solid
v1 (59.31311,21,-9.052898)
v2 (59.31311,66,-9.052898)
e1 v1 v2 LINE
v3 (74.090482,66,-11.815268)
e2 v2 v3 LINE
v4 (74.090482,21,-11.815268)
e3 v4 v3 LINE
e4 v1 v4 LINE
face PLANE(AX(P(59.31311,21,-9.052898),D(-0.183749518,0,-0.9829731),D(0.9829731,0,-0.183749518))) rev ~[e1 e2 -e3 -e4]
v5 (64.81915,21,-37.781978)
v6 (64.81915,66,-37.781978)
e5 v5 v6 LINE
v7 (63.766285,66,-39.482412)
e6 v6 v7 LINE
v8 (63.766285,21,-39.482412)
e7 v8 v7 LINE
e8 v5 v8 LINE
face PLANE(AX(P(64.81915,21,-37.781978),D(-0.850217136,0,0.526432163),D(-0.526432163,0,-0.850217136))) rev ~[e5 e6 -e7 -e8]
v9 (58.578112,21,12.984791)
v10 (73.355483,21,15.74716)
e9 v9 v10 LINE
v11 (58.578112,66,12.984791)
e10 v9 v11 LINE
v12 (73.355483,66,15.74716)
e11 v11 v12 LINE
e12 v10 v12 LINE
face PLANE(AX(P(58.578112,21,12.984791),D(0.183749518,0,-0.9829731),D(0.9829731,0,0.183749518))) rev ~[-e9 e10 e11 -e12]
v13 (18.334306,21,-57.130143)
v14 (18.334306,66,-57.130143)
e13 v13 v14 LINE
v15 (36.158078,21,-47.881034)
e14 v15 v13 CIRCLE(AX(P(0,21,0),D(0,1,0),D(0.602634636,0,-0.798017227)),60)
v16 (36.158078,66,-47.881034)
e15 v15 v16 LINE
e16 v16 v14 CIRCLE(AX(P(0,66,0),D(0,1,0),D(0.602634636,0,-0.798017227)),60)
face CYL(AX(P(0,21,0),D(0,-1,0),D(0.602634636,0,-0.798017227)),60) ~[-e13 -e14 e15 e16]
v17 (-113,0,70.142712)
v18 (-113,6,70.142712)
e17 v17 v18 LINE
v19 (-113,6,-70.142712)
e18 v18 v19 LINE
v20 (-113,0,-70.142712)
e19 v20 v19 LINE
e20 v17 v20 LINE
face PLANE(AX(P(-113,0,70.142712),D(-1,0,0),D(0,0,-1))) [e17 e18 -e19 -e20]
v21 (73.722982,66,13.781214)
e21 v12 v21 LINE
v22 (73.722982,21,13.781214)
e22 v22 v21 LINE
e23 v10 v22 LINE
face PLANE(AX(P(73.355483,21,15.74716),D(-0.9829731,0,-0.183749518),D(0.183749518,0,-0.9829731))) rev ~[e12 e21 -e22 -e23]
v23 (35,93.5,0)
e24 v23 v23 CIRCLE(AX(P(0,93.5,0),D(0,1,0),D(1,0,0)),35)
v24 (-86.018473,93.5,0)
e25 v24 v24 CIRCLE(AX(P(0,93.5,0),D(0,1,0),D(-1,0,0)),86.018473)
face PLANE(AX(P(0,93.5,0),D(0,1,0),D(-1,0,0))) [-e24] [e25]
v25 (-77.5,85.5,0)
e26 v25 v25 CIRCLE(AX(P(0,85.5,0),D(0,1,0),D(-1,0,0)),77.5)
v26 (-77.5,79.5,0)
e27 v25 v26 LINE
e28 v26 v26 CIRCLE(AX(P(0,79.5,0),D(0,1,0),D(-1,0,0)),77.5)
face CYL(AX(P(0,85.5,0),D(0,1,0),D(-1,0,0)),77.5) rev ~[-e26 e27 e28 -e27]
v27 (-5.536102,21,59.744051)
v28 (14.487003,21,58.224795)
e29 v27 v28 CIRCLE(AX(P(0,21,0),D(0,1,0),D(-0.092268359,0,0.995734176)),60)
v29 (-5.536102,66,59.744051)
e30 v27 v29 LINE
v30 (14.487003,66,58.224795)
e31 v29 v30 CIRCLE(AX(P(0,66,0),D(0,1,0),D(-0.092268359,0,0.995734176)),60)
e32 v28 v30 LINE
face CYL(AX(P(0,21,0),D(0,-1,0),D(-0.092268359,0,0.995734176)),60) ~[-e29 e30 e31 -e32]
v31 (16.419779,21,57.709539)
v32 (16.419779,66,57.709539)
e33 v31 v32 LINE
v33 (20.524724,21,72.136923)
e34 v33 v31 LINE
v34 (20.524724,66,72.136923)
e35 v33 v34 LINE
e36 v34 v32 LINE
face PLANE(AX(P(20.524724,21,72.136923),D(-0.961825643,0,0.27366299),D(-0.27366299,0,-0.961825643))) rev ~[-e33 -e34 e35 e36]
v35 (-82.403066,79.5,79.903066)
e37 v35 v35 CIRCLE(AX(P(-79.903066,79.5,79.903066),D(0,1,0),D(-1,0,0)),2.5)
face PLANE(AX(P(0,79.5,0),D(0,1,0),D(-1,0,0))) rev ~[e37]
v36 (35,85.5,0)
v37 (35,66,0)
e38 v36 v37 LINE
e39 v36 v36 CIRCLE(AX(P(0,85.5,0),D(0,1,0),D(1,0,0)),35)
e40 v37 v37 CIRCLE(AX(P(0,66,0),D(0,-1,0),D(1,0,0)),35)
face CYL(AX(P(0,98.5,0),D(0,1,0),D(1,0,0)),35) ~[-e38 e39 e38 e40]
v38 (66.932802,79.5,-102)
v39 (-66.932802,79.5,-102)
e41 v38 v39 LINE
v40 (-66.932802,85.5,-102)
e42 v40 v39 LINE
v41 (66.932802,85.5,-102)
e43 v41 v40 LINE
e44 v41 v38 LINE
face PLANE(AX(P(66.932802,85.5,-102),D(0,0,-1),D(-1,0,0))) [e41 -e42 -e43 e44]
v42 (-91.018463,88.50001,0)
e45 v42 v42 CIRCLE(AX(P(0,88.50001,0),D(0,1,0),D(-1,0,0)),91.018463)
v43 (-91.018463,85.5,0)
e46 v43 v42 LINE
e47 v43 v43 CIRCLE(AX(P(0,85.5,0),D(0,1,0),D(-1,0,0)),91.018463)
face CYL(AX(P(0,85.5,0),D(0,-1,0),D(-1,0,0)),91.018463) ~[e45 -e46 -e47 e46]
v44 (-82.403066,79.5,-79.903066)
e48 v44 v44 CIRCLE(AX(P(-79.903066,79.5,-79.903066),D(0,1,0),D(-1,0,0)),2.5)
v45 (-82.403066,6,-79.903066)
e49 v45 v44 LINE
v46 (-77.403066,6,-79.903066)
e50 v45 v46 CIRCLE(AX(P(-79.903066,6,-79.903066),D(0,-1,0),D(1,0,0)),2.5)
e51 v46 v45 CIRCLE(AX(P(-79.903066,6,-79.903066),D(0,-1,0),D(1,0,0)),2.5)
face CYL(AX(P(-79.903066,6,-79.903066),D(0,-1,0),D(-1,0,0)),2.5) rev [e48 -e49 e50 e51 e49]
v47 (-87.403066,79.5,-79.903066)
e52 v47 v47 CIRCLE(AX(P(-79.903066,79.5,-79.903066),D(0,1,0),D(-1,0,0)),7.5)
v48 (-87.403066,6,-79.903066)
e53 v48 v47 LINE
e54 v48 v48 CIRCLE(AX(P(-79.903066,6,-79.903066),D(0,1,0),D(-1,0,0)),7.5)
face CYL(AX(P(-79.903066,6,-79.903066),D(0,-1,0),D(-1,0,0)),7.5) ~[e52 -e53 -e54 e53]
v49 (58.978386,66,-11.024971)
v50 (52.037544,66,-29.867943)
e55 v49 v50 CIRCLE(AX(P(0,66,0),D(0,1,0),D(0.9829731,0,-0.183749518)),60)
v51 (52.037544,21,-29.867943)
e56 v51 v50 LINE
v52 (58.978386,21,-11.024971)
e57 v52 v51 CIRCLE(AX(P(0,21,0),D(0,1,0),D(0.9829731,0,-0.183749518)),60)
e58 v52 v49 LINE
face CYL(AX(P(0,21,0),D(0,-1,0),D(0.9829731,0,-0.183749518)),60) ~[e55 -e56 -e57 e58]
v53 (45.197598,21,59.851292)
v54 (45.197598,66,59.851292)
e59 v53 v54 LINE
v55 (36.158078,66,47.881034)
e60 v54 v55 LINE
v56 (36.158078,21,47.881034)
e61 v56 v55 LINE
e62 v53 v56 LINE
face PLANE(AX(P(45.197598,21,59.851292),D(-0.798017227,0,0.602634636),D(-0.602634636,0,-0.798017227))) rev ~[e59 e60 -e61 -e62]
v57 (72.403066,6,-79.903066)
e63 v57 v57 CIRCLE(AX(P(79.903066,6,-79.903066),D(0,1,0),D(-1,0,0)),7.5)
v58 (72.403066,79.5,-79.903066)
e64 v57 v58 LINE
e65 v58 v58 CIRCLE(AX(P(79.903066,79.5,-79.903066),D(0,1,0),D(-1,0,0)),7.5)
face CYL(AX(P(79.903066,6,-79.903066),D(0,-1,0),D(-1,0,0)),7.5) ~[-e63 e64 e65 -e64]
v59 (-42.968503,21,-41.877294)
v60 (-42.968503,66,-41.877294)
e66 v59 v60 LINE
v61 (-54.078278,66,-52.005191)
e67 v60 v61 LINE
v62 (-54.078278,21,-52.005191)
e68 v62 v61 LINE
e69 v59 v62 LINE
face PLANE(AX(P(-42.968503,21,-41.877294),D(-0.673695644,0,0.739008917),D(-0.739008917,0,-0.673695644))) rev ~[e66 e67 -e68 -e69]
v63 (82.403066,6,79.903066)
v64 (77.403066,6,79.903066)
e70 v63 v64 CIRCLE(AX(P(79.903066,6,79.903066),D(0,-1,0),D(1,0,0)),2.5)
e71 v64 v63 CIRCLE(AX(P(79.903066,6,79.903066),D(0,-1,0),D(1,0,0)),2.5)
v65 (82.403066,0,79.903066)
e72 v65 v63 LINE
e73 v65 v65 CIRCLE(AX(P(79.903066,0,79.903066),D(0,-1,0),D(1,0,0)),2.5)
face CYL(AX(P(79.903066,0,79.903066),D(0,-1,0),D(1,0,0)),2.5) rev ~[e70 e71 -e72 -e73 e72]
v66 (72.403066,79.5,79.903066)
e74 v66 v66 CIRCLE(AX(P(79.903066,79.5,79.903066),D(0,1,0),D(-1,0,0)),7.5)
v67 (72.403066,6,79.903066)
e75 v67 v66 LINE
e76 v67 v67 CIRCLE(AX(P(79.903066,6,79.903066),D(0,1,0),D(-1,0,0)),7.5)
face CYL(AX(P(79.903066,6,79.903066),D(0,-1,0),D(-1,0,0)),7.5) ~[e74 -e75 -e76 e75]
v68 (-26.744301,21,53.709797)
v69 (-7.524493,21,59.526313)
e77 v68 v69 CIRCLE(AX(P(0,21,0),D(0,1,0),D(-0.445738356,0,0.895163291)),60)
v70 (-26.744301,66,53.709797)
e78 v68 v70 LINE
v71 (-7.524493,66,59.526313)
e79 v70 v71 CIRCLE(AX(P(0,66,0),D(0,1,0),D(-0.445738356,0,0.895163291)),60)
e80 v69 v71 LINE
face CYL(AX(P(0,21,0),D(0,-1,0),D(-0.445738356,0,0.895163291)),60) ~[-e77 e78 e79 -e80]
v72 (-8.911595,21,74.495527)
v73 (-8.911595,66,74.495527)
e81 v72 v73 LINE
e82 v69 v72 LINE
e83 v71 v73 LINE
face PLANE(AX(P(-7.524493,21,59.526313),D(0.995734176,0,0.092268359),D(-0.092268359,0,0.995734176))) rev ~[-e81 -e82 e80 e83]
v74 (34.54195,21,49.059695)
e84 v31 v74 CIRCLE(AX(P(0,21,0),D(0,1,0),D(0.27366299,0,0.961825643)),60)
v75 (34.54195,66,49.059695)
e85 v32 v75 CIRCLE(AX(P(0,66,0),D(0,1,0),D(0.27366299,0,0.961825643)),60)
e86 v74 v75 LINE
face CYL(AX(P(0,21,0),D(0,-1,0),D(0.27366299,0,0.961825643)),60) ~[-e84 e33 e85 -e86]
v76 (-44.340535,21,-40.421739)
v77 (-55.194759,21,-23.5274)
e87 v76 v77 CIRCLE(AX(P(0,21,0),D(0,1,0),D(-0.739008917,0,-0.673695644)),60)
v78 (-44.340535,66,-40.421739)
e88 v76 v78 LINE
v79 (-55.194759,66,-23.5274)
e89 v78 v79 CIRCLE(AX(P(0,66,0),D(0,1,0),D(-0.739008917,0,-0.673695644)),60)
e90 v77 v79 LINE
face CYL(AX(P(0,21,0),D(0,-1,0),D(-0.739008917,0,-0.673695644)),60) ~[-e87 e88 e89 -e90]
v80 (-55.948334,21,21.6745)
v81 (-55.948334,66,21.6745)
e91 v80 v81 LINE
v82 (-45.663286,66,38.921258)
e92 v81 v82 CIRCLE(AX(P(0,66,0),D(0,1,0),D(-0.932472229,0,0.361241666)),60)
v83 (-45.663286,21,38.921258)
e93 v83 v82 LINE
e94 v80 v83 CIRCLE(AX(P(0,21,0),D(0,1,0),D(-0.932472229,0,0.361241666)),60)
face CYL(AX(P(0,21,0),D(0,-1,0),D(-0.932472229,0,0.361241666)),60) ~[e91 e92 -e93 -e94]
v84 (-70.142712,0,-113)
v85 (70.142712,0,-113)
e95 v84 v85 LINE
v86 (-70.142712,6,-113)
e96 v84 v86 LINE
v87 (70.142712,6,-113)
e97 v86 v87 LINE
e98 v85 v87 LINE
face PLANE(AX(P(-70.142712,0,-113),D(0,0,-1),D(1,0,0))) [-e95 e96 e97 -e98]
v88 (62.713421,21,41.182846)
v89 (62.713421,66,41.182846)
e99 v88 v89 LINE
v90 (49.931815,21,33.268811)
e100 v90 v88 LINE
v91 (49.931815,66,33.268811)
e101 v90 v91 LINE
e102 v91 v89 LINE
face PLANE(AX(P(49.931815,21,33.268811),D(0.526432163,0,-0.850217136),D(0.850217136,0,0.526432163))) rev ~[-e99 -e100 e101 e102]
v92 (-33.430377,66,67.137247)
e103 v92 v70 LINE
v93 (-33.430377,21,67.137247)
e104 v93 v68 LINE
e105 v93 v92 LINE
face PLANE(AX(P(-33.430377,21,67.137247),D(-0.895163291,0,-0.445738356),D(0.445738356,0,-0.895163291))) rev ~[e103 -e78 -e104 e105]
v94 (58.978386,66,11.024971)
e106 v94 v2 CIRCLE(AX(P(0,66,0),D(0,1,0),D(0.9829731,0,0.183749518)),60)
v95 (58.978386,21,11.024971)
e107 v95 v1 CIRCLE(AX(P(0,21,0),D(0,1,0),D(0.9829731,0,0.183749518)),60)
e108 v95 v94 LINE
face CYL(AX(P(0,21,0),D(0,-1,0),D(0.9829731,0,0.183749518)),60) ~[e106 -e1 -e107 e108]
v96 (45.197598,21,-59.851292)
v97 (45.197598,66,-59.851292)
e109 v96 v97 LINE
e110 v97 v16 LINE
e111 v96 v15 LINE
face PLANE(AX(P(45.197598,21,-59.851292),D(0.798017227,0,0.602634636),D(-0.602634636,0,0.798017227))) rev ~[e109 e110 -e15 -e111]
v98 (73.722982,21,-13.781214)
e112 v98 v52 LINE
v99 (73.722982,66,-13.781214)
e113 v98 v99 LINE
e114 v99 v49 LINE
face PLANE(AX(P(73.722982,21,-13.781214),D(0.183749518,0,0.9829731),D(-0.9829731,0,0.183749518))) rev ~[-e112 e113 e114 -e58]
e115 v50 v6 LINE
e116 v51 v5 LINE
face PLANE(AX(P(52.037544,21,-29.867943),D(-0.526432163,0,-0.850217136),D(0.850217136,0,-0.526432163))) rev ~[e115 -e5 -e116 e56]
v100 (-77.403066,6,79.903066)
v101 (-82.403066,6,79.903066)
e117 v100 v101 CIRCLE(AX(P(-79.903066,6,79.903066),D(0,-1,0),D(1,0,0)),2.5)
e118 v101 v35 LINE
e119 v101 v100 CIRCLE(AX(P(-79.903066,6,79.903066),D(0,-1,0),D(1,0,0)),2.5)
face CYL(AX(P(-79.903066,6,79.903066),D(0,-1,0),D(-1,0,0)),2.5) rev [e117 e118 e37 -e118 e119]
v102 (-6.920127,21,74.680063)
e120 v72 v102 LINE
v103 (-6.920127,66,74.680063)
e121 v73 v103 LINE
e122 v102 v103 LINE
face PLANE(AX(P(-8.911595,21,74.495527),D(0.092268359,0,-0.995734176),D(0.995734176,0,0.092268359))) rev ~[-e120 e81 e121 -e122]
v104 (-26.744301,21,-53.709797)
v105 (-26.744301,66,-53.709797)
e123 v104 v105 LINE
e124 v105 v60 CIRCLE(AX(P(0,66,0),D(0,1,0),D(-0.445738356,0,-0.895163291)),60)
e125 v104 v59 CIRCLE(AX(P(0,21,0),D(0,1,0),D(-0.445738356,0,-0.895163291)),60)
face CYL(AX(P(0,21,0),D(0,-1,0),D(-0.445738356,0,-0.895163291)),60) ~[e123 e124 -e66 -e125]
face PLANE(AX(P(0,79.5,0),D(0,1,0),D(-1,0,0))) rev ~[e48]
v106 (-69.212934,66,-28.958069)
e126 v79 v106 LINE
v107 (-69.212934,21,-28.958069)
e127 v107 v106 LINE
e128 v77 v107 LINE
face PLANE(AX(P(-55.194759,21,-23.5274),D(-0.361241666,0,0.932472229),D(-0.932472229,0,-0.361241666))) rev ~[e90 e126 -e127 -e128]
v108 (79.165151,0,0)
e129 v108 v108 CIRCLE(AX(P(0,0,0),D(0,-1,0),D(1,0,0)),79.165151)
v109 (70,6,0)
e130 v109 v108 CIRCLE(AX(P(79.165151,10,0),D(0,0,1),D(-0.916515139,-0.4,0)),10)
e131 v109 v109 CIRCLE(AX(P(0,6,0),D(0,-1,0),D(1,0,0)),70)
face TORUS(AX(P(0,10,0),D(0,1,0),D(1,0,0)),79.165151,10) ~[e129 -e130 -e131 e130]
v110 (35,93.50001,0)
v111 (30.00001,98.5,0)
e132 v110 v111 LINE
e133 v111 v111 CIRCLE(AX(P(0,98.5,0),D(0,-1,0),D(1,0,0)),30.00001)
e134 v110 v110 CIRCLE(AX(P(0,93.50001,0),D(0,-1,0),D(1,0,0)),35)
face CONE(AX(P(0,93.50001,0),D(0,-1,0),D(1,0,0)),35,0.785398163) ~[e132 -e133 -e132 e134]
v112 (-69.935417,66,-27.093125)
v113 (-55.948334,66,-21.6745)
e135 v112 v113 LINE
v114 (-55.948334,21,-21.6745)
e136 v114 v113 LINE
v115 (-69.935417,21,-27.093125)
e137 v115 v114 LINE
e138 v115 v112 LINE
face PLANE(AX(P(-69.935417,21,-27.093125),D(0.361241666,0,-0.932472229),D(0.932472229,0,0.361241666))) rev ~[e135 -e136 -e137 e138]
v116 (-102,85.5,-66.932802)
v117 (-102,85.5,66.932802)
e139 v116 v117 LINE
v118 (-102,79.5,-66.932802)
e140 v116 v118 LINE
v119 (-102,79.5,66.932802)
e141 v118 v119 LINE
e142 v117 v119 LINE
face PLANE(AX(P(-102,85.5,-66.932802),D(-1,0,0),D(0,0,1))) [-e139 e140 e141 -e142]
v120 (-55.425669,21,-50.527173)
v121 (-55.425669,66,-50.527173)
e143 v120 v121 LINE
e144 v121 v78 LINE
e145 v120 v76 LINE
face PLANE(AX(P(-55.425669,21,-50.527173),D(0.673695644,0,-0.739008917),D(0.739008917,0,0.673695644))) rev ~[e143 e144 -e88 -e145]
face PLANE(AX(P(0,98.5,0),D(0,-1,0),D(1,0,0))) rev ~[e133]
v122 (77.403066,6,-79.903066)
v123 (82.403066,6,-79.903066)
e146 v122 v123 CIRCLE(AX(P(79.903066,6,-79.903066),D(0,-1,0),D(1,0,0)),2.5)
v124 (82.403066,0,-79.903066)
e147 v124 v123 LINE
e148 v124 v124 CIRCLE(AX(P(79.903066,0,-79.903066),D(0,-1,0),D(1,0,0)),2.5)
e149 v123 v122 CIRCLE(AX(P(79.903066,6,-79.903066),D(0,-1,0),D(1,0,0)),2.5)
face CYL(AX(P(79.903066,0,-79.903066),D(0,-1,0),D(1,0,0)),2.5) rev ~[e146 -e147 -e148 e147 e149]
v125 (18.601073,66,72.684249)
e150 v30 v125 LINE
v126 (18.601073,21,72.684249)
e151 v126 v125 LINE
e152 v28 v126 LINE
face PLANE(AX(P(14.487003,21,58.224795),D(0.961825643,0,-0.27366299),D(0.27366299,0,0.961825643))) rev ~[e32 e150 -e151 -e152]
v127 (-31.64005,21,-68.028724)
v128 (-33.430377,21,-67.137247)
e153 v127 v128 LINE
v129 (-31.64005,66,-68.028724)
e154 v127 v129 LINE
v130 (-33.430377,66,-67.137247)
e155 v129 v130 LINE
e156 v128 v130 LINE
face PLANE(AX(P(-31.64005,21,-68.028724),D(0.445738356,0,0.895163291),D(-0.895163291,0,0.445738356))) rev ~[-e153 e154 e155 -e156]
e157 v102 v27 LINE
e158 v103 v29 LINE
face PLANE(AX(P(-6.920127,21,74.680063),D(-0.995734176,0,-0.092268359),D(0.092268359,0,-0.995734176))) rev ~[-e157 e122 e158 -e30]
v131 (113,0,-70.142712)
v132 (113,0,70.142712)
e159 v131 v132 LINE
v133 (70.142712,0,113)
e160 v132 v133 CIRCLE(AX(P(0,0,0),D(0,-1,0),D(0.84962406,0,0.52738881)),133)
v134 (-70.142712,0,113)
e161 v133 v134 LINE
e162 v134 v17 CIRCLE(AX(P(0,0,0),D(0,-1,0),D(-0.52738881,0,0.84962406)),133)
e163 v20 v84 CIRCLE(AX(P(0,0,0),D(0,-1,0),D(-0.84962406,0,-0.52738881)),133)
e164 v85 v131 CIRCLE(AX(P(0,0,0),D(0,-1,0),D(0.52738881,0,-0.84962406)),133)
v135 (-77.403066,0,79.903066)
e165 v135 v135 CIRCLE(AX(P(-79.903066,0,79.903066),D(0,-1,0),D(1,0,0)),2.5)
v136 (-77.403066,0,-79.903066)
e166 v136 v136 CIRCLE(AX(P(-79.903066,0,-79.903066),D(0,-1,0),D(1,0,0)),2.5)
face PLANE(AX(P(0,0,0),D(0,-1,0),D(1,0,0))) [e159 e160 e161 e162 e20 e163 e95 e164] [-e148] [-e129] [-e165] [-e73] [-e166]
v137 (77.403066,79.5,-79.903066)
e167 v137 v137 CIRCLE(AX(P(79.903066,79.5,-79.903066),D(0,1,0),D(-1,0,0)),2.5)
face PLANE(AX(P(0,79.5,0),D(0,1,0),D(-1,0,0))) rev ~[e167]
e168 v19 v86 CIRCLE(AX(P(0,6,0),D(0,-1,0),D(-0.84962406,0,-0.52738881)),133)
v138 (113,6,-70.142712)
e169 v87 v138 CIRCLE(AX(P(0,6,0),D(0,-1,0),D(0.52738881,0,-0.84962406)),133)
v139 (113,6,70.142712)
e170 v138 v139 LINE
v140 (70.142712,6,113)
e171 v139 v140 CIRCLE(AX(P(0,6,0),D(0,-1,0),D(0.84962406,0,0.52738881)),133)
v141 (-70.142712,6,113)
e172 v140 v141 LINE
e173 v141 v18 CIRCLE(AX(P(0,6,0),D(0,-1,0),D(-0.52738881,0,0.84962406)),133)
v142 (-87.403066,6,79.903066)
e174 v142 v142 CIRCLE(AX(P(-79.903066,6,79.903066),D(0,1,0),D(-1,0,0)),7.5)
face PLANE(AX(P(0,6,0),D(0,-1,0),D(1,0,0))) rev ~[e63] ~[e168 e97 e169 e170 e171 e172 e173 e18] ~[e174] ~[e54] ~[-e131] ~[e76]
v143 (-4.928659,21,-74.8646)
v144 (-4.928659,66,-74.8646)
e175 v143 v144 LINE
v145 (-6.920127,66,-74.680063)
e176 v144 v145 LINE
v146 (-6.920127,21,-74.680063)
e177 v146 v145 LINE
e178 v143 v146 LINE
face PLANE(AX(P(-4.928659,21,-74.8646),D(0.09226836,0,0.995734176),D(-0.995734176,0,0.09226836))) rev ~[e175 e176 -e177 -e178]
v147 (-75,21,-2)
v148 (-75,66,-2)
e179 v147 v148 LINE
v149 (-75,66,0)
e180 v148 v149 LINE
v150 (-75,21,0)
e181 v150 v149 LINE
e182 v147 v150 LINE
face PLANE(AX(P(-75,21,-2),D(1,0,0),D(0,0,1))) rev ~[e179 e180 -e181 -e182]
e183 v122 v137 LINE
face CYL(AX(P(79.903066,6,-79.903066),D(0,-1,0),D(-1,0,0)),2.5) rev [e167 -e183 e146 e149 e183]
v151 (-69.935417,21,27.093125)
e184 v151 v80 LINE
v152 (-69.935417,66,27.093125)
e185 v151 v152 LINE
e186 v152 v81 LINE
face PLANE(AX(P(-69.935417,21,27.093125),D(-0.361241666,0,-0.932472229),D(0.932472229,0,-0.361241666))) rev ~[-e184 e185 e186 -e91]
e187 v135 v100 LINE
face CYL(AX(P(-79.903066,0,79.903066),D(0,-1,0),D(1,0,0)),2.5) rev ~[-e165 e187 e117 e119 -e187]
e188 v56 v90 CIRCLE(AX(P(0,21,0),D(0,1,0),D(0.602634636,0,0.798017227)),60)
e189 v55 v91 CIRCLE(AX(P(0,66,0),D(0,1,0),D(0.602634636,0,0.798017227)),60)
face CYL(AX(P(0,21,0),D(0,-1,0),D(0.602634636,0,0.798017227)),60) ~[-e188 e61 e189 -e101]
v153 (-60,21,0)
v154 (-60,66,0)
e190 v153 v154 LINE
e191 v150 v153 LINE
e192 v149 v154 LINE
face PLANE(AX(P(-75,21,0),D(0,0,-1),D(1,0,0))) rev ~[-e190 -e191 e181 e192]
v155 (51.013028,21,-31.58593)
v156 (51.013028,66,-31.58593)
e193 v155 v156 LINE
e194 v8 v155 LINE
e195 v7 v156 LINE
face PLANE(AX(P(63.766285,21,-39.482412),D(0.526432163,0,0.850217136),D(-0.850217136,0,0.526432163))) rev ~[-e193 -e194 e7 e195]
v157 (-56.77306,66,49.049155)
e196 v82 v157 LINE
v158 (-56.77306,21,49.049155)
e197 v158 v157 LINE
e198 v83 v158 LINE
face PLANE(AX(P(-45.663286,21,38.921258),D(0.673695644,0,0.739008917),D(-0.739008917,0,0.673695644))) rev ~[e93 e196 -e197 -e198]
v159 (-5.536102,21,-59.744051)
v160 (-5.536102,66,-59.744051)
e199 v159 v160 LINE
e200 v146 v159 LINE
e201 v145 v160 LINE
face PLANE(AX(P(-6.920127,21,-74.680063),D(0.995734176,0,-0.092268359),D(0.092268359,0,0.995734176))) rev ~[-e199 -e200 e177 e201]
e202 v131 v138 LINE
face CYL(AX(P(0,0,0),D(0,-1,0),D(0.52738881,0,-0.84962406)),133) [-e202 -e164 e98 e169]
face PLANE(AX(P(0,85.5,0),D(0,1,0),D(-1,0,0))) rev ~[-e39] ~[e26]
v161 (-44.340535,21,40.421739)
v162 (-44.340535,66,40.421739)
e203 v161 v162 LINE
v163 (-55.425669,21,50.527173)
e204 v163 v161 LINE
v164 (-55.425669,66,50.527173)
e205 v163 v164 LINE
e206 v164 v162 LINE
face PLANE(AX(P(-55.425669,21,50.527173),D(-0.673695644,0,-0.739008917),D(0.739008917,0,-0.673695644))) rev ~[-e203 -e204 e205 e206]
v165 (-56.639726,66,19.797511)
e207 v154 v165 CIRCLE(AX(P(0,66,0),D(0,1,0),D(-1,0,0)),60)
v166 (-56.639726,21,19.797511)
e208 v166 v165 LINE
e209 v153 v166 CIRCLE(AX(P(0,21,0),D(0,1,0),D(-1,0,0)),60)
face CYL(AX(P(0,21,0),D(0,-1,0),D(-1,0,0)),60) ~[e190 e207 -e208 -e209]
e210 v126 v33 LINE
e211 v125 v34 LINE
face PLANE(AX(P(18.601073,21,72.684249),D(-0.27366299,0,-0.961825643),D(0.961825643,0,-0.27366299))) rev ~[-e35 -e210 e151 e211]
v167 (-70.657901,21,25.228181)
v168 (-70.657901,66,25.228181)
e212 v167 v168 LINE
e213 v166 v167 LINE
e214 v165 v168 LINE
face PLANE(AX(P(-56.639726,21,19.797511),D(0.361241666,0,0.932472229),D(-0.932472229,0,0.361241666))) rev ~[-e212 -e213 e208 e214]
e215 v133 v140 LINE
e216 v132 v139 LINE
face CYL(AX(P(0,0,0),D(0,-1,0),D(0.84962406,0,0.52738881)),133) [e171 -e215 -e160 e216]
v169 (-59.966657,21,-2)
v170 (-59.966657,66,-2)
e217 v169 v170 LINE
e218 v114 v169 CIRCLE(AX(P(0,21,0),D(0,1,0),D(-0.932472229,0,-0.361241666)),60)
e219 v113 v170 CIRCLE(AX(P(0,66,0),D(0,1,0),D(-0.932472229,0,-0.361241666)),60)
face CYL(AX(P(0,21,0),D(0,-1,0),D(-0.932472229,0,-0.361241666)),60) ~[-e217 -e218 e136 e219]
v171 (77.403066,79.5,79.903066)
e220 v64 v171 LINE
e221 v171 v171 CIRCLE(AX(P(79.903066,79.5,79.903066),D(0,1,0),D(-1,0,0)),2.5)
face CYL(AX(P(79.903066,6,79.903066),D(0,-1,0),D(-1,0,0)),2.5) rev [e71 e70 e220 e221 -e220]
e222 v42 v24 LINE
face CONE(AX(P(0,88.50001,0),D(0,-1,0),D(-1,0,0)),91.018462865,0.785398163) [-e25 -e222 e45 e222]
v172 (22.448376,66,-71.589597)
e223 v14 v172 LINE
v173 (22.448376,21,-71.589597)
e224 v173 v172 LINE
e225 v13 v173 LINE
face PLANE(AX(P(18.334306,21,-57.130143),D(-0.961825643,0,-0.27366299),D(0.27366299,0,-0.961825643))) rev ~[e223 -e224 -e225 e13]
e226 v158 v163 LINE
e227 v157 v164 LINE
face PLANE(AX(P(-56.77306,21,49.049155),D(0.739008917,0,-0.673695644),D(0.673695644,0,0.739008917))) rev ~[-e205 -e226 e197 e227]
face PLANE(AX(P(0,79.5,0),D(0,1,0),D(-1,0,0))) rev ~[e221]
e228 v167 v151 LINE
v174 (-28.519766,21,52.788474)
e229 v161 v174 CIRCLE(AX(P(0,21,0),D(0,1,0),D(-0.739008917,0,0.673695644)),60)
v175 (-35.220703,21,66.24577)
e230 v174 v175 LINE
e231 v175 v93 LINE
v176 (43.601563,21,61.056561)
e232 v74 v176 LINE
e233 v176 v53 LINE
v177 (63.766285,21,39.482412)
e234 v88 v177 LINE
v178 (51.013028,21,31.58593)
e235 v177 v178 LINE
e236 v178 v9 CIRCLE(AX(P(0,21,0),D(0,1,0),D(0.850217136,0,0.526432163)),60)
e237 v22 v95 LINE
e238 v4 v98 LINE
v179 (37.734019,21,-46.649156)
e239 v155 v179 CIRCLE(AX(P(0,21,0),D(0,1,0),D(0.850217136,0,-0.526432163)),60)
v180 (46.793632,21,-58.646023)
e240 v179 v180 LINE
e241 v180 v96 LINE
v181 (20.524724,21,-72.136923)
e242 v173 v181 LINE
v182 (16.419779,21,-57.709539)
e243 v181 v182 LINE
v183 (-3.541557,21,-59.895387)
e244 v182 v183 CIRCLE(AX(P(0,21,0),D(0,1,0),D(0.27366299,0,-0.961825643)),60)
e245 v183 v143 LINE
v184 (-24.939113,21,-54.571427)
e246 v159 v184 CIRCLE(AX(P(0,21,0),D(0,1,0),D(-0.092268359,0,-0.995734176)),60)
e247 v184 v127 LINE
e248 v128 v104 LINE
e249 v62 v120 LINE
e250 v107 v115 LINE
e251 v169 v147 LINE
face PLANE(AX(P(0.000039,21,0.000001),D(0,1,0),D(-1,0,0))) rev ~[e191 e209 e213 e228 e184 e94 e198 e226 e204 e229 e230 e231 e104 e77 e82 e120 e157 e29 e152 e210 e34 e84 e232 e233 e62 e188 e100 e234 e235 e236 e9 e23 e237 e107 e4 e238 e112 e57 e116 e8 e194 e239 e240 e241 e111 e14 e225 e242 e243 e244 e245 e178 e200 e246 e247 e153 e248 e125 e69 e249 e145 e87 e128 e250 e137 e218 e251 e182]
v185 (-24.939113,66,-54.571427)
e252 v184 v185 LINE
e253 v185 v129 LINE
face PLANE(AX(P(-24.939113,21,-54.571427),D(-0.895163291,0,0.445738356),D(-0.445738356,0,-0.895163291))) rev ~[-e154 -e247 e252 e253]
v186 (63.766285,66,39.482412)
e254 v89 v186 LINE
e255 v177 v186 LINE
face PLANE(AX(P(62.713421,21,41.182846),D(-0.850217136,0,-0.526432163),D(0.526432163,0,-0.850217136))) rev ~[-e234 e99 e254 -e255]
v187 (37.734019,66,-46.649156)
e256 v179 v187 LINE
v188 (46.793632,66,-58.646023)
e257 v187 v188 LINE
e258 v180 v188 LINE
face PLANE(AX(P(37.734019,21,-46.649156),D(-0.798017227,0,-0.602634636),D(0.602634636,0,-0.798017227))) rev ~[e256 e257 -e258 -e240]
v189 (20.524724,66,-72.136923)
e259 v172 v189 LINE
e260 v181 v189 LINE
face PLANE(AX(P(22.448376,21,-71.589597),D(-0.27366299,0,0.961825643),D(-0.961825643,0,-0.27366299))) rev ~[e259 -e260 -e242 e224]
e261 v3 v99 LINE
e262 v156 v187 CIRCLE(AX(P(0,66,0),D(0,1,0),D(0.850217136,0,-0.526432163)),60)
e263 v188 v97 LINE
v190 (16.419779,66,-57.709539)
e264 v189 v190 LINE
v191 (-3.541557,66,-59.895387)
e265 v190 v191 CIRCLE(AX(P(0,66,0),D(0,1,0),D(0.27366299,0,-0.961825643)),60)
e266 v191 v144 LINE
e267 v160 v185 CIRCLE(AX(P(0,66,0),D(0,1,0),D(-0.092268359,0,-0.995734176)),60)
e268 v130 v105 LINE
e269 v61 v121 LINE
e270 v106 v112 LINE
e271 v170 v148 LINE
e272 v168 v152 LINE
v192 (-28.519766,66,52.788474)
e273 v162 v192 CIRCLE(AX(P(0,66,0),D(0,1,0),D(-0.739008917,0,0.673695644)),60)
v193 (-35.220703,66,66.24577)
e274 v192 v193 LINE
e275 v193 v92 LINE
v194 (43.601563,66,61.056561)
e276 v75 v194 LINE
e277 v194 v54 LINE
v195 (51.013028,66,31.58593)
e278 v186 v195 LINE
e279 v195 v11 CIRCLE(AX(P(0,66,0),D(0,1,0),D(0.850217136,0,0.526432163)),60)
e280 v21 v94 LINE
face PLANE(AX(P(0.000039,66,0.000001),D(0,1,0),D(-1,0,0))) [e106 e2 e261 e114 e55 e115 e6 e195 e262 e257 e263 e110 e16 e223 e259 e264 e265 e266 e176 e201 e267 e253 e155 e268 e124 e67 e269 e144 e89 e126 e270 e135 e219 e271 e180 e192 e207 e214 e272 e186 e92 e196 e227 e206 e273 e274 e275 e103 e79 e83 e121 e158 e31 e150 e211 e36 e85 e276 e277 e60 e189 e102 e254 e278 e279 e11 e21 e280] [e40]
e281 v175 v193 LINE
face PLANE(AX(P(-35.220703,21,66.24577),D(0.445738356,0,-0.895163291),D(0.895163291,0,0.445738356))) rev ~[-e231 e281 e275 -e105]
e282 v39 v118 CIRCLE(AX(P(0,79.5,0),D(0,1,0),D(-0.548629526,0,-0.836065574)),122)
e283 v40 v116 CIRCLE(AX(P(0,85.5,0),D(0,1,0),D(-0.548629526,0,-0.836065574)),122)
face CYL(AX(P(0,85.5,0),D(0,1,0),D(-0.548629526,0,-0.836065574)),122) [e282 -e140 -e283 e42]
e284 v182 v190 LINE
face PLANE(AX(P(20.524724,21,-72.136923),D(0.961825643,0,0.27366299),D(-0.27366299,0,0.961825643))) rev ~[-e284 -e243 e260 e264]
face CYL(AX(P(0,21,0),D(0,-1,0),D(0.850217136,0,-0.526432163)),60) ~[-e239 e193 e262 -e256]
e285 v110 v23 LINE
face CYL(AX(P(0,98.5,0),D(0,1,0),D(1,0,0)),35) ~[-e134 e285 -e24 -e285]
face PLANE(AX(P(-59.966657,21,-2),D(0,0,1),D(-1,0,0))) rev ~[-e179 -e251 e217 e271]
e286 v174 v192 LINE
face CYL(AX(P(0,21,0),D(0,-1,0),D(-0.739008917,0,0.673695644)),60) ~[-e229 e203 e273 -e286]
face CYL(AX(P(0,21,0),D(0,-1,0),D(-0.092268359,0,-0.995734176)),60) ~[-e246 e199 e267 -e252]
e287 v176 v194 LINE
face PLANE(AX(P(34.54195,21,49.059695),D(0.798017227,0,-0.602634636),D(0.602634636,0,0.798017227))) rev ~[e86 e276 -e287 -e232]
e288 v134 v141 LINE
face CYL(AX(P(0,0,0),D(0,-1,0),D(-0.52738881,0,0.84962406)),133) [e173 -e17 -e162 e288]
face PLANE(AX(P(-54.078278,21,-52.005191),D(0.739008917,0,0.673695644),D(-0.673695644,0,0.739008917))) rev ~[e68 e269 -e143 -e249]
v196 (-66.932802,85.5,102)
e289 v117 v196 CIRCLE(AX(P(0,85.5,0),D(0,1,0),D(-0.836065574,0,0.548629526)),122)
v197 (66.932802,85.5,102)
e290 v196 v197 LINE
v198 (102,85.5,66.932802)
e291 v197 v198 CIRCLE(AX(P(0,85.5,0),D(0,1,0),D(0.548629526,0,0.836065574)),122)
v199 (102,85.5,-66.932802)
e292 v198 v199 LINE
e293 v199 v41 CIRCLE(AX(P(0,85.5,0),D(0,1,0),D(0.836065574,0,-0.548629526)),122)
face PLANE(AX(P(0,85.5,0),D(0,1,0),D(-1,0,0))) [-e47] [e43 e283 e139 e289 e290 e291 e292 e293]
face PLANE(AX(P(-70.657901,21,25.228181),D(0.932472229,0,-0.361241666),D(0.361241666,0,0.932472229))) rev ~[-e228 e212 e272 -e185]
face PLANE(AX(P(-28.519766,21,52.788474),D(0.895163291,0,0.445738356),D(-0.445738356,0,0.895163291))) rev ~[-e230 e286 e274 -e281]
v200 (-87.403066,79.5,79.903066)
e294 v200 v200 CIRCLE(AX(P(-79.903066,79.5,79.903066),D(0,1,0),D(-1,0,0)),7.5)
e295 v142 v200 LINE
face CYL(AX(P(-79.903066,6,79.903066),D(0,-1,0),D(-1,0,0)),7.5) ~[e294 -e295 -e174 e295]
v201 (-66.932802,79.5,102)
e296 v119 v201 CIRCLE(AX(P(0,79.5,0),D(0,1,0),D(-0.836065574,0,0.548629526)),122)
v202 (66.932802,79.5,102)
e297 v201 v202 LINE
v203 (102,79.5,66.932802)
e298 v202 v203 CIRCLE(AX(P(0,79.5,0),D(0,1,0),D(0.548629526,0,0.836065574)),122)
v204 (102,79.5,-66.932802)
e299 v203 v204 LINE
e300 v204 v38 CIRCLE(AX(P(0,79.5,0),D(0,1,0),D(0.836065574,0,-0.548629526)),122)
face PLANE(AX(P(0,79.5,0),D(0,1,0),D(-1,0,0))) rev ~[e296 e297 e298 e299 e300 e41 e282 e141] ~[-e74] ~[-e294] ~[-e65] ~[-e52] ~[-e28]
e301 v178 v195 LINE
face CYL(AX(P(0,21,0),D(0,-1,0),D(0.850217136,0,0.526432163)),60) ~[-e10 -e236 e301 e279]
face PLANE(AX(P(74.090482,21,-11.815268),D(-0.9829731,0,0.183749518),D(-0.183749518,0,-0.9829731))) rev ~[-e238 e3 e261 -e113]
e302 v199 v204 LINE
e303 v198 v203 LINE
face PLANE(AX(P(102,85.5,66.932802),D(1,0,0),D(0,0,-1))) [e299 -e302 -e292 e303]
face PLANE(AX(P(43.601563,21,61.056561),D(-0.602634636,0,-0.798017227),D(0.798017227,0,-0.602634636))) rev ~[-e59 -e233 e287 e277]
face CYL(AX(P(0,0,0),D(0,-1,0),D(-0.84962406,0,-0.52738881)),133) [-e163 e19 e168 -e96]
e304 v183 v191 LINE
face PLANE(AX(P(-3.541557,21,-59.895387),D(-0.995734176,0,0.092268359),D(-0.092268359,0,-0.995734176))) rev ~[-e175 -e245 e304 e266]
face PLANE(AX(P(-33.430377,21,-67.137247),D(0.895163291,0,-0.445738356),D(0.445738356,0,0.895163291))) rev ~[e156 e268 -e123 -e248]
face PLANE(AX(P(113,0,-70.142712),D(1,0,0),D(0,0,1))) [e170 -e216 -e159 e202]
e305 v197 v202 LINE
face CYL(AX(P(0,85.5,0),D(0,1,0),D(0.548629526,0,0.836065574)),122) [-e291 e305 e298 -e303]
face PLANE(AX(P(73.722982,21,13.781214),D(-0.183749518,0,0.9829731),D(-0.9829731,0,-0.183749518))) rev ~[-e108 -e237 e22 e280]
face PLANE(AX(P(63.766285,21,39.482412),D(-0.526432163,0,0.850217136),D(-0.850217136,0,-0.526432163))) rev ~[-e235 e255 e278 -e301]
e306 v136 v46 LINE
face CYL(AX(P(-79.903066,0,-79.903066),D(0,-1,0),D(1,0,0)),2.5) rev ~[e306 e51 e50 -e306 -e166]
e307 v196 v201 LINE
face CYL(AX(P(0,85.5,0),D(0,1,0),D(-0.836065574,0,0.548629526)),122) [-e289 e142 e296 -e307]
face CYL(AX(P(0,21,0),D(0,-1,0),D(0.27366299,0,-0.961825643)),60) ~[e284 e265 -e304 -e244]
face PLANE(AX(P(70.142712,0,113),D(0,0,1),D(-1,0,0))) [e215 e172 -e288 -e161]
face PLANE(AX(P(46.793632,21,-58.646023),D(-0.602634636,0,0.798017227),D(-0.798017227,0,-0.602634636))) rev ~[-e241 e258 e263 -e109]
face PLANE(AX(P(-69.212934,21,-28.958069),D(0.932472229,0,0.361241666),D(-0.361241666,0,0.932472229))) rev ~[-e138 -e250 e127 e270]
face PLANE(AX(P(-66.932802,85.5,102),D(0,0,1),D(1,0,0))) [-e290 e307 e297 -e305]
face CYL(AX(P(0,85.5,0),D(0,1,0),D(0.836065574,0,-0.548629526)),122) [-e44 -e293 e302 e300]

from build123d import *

# Parameters (mm, degrees)
F0_R      = 2.5
F0_R_2    = 70
F1_DEPTH  = 6
F3_R      = 77.5
F4_DEPTH  = 6
F5_R      = 7.5
F5_R_2    = 2.5
F6_DEPTH  = 73.5
F9_DEPTH  = 45
F11_R     = 35
F12_DEPTH = 32.5
F13_R     = 91.0184628647
F13_R_2   = 34.9752900341
F14_DEPTH = 8
F15_SIZE  = 4.99999
F13_R_3   = 77.5
F17_DEPTH = 25


# Not quite as in the source:
# - a fillet or chamfer that OpenCascade refuses, or shapes differently, is made with other operations: its cross-section is extruded or revolved along the edge and cut away or added
# - a fillet or chamfer is up to 0.001 mm smaller than in the source, because OpenCascade refuses the exact size


with BuildPart() as f1:
    # F0 (on Front) → F1 (new body)
    with BuildSketch(Plane.XZ):
        with BuildLine():
            Line((70.142711667, 113), (-70.142711667, 113))
            ThreePointArc((-70.142711667, 113), (-94.0452018978, 94.0452018978), (-113, 70.142711667))
            Line((-113, 70.142711667), (-113, -70.142711667))
            ThreePointArc((-113, -70.142711667), (-94.0452018978, -94.0452018978), (-70.142711667, -113))
            Line((-70.142711667, -113), (70.142711667, -113))
            ThreePointArc((70.142711667, -113), (94.0452018978, -94.0452018978), (113, -70.142711667))
            Line((113, -70.142711667), (113, 70.142711667))
            ThreePointArc((113, 70.142711667), (94.0452018978, 94.0452018978), (70.142711667, 113))
        make_face()
        with Locations((-79.9030662741, -79.9030662741)):
            Circle(F0_R, mode=Mode.SUBTRACT)
        with Locations((79.9030662741, -79.9030662741)):
            Circle(F0_R, mode=Mode.SUBTRACT)
        with Locations((-79.9030662741, 79.9030662741)):
            Circle(F0_R, mode=Mode.SUBTRACT)
        Circle(F0_R_2, mode=Mode.SUBTRACT)
        with Locations((79.9030662741, 79.9030662741)):
            Circle(F0_R, mode=Mode.SUBTRACT)
    extrude(amount=-F1_DEPTH)



with BuildPart() as f4:
    # F3 (on offset) → F4 (new body)
    with BuildSketch(Plane(origin=(0, 85.5, 0), x_dir=(-1, 0, 0), z_dir=(0, 1, 0))):
        with BuildLine():
            Line((102, -66.9328021227), (102, 66.9328021227))
            ThreePointArc((102, 66.9328021227), (86.2670273048, 86.2670273048), (66.9328021227, 102))
            Line((66.9328021227, 102), (-66.9328021227, 102))
            ThreePointArc((-66.9328021227, 102), (-86.2670273048, 86.2670273048), (-102, 66.9328021227))
            Line((-102, 66.9328021227), (-102, -66.9328021227))
            ThreePointArc((-102, -66.9328021227), (-86.2670273048, -86.2670273048), (-66.9328021227, -102))
            Line((-66.9328021227, -102), (66.9328021227, -102))
            ThreePointArc((66.9328021227, -102), (86.2670273048, -86.2670273048), (102, -66.9328021227))
        make_face()
        Circle(F3_R, mode=Mode.SUBTRACT)
    extrude(amount=-F4_DEPTH)


with BuildPart() as f1_1:
    add(f1.part)

    add(f4.part)  # F6 merges F4
    # F5 (on face) → F6 (join, through all)
    with BuildSketch(Plane(origin=(0, 6, 0), x_dir=(-1, 0, 0), z_dir=(0, 1, 0))):
        with Locations((-79.9030662741, 79.9030662741)):
            Circle(F5_R)
        with Locations((-79.9030662741, 79.9030662741)):
            Circle(F5_R_2, mode=Mode.SUBTRACT)
        with Locations((79.9030662741, 79.9030662741)):
            Circle(F5_R)
        with Locations((79.9030662741, 79.9030662741)):
            Circle(F5_R_2, mode=Mode.SUBTRACT)
        with Locations((-79.9030662741, -79.9030662741)):
            Circle(F5_R)
        with Locations((-79.9030662741, -79.9030662741)):
            Circle(F5_R_2, mode=Mode.SUBTRACT)
        with Locations((79.9030662741, -79.9030662741)):
            Circle(F5_R)
        with Locations((79.9030662741, -79.9030662741)):
            Circle(F5_R_2, mode=Mode.SUBTRACT)
    extrude(amount=F6_DEPTH)



with BuildPart() as f9:
    # F8 (on offset) → F9 (new body)
    with BuildSketch(Plane(origin=(0, 21, 0), x_dir=(-1, 0, 0), z_dir=(0, 1, 0))):
        with BuildLine():
            Line((59.9666574023, -2), (60, 0))
            ThreePointArc((60, 0), (59.1539667436, 10.0403296009), (56.6397260502, 19.7975107769))
            ThreePointArc((56.6397260502, 19.7975107769), (56.3018523257, 20.7388867757), (55.9483337643, 21.6744999712))
            ThreePointArc((55.9483337643, 21.6744999712), (51.5324458534, 30.7312060349), (45.6632858435, 38.9212580215))
            ThreePointArc((45.6632858435, 38.9212580215), (45.008163744, 39.6770109307), (44.3405350332, 40.4217386188))
            ThreePointArc((44.3405350332, 40.4217386188), (36.9511825996, 47.2716628065), (28.5197658546, 52.7884737002))
            ThreePointArc((28.5197658546, 52.7884737002), (27.6358732499, 53.2565349015), (26.7443013466, 53.7097974813))
            ThreePointArc((26.7443013466, 53.7097974813), (17.3794573821, 57.4278195747), (7.5244934536, 59.5263134947))
            ThreePointArc((7.5244934536, 59.5263134947), (6.5312049376, 59.6434687293), (5.5361015678, 59.7440505777))
            ThreePointArc((5.5361015678, 59.7440505777), (-4.5394598577, 59.8280310908), (-14.487003483, 58.224794805))
            ThreePointArc((-14.487003483, 58.224794805), (-15.455538792, 57.9752216093), (-16.4197794043, 57.7095385904))
            ThreePointArc((-16.4197794043, 57.7095385904), (-25.8452978897, 54.1481354895), (-34.5419503239, 49.0596949422))
            ThreePointArc((-34.5419503239, 49.0596949422), (-35.3549263658, 48.4770995592), (-36.1580781828, 47.8810336368))
            ThreePointArc((-36.1580781828, 47.8810336368), (-43.660585228, 41.1552341452), (-49.9318153701, 33.2688114283))
            ThreePointArc((-49.9318153701, 33.2688114283), (-50.4794352254, 32.4318765927), (-51.0130281438, 31.5859297726))
            ThreePointArc((-51.0130281438, 31.5859297726), (-55.5792685996, 22.6040903806), (-58.5781120687, 12.9847905821))
            ThreePointArc((-58.5781120687, 12.9847905821), (-58.7864166416, 12.0065489812), (-58.978385981, 11.024971069))
            ThreePointArc((-58.978385981, 11.024971069), (-59.9916637715, 1.0001389564), (-59.31311014, -9.0528981834))
            ThreePointArc((-59.31311014, -9.0528981834), (-59.1539667436, -10.0403296009), (-58.978385981, -11.024971069))
            ThreePointArc((-58.978385981, -11.024971069), (-56.3018523257, -20.7388867757), (-52.0375440216, -29.8679428853))
            ThreePointArc((-52.0375440216, -29.8679428853), (-51.5324458534, -30.7312060349), (-51.0130281438, -31.5859297726))
            ThreePointArc((-51.0130281438, -31.5859297726), (-45.008163744, -39.6770109307), (-37.7340192331, -46.6491563967))
            ThreePointArc((-37.7340192331, -46.6491563967), (-36.9511825996, -47.2716628065), (-36.1580781828, -47.8810336368))
            ThreePointArc((-36.1580781828, -47.8810336368), (-27.6358732499, -53.2565349015), (-18.3343060557, -57.1301428447))
            ThreePointArc((-18.3343060557, -57.1301428447), (-17.3794573821, -57.4278195747), (-16.4197794043, -57.7095385904))
            ThreePointArc((-16.4197794043, -57.7095385904), (-6.5312049376, -59.6434687293), (3.5415567484, -59.8953869325))
            ThreePointArc((3.5415567484, -59.8953869325), (4.5394598577, -59.8280310908), (5.5361015678, -59.7440505777))
            ThreePointArc((5.5361015678, -59.7440505777), (15.455538792, -57.9752216093), (24.9391126892, -54.5714271233))
            ThreePointArc((24.9391126892, -54.5714271233), (25.8452978897, -54.1481354895), (26.7443013466, -53.7097974813))
            ThreePointArc((26.7443013466, -53.7097974813), (35.3549263658, -48.4770995592), (42.9685032689, -41.8772936904))
            ThreePointArc((42.9685032689, -41.8772936904), (43.660585228, -41.1552341452), (44.3405350332, -40.4217386188))
            ThreePointArc((44.3405350332, -40.4217386188), (50.4794352254, -32.4318765927), (55.1947593854, -23.5273996945))
            ThreePointArc((55.1947593854, -23.5273996945), (55.5792685996, -22.6040903806), (55.9483337643, -21.6744999712))
            ThreePointArc((55.9483337643, -21.6744999712), (58.7864166416, -12.0065489812), (59.9666574023, -2))
        make_face()
        with BuildLine():
            Line((75, 0), (60, 0))
            ThreePointArc((60, 0), (59.9916637715, -1.0001389564), (59.9666574023, -2))
            Line((59.9666574023, -2), (75, -2))
            Line((75, -2), (75, 0))
        make_face()
        with BuildLine():
            ThreePointArc((59.9666574023, -2), (59.9916637715, -1.0001389564), (60, 0))
            Line((60, 0), (59.9666574023, -2))
        make_face()
        with BuildLine():
            ThreePointArc((55.9483337643, 21.6744999712), (56.3018523257, 20.7388867757), (56.6397260502, 19.7975107769))
            Line((56.6397260502, 19.7975107769), (70.6579005377, 25.2281805052))
            Line((70.6579005377, 25.2281805052), (69.9354172053, 27.093124964))
            Line((69.9354172053, 27.093124964), (55.9483337643, 21.6744999712))
        make_face()
        with BuildLine():
            Line((69.9354172053, -27.093124964), (55.9483337643, -21.6744999712))
            ThreePointArc((55.9483337643, -21.6744999712), (55.5792685996, -22.6040903806), (55.1947593854, -23.5273996945))
            Line((55.1947593854, -23.5273996945), (69.212933873, -28.9580694228))
            Line((69.212933873, -28.9580694228), (69.9354172053, -27.093124964))
        make_face()
        with BuildLine():
            ThreePointArc((44.3405350332, 40.4217386188), (45.008163744, 39.6770109307), (45.6632858435, 38.9212580215))
            Line((45.6632858435, 38.9212580215), (56.7730600788, 49.0491554391))
            Line((56.7730600788, 49.0491554391), (55.4256687915, 50.5271732735))
            Line((55.4256687915, 50.5271732735), (44.3405350332, 40.4217386188))
        make_face()
        with BuildLine():
            Line((55.4256687915, -50.5271732735), (44.3405350332, -40.4217386188))
            ThreePointArc((44.3405350332, -40.4217386188), (43.660585228, -41.1552341452), (42.9685032689, -41.8772936904))
            Line((42.9685032689, -41.8772936904), (54.0782775043, -52.0051911079))
            Line((54.0782775043, -52.0051911079), (55.4256687915, -50.5271732735))
        make_face()
        with BuildLine():
            ThreePointArc((26.7443013466, 53.7097974813), (27.6358732499, 53.2565349015), (28.5197658546, 52.7884737002))
            Line((28.5197658546, 52.7884737002), (35.220703266, 66.2457701401))
            Line((35.220703266, 66.2457701401), (33.4303766832, 67.1372468516))
            Line((33.4303766832, 67.1372468516), (26.7443013466, 53.7097974813))
        make_face()
        with BuildLine():
            Line((33.4303766832, -67.1372468516), (26.7443013466, -53.7097974813))
            ThreePointArc((26.7443013466, -53.7097974813), (25.8452978897, -54.1481354895), (24.9391126892, -54.5714271233))
            Line((24.9391126892, -54.5714271233), (31.6400501005, -68.0287235632))
            Line((31.6400501005, -68.0287235632), (33.4303766832, -67.1372468516))
        make_face()
        with BuildLine():
            ThreePointArc((5.5361015678, 59.7440505777), (6.5312049376, 59.6434687293), (7.5244934536, 59.5263134947))
            Line((7.5244934536, 59.5263134947), (8.9115953123, 74.4955265032))
            Line((8.9115953123, 74.4955265032), (6.9201269597, 74.6800632221))
            Line((6.9201269597, 74.6800632221), (5.5361015678, 59.7440505777))
        make_face()
        with BuildLine():
            Line((6.9201269597, -74.6800632221), (5.5361015678, -59.7440505777))
            ThreePointArc((5.5361015678, -59.7440505777), (4.5394598577, -59.8280310908), (3.5415567484, -59.8953869325))
            Line((3.5415567484, -59.8953869325), (4.9286586072, -74.8645999411))
            Line((4.9286586072, -74.8645999411), (6.9201269597, -74.6800632221))
        make_face()
        with BuildLine():
            ThreePointArc((-16.4197794043, 57.7095385904), (-15.455538792, 57.9752216093), (-14.487003483, 58.224794805))
            Line((-14.487003483, 58.224794805), (-18.6010729691, 72.6842492181))
            Line((-18.6010729691, 72.6842492181), (-20.5247242554, 72.136923238))
            Line((-20.5247242554, 72.136923238), (-16.4197794043, 57.7095385904))
        make_face()
        with BuildLine():
            Line((-20.5247242554, -72.136923238), (-16.4197794043, -57.7095385904))
            ThreePointArc((-16.4197794043, -57.7095385904), (-17.3794573821, -57.4278195747), (-18.3343060557, -57.1301428447))
            Line((-18.3343060557, -57.1301428447), (-22.4483755418, -71.5895972578))
            Line((-22.4483755418, -71.5895972578), (-20.5247242554, -72.136923238))
        make_face()
        with BuildLine():
            ThreePointArc((-36.1580781828, 47.8810336368), (-35.3549263658, 48.4770995592), (-34.5419503239, 49.0596949422))
            Line((-34.5419503239, 49.0596949422), (-43.6015632739, 61.0565613188))
            Line((-43.6015632739, 61.0565613188), (-45.1975977284, 59.851292046))
            Line((-45.1975977284, 59.851292046), (-36.1580781828, 47.8810336368))
        make_face()
        with BuildLine():
            Line((-45.1975977284, -59.851292046), (-36.1580781828, -47.8810336368))
            ThreePointArc((-36.1580781828, -47.8810336368), (-36.9511825996, -47.2716628065), (-37.7340192331, -46.6491563967))
            Line((-37.7340192331, -46.6491563967), (-46.793632183, -58.6460227733))
            Line((-46.793632183, -58.6460227733), (-45.1975977284, -59.851292046))
        make_face()
        with BuildLine():
            ThreePointArc((-51.0130281438, 31.5859297726), (-50.4794352254, 32.4318765927), (-49.9318153701, 33.2688114283))
            Line((-49.9318153701, 33.2688114283), (-62.713420854, 41.1828464873))
            Line((-62.713420854, 41.1828464873), (-63.7662851797, 39.4824122158))
            Line((-63.7662851797, 39.4824122158), (-51.0130281438, 31.5859297726))
        make_face()
        with BuildLine():
            Line((-63.7662851797, -39.4824122158), (-51.0130281438, -31.5859297726))
            ThreePointArc((-51.0130281438, -31.5859297726), (-51.5324458534, -30.7312060349), (-52.0375440216, -29.8679428853))
            Line((-52.0375440216, -29.8679428853), (-64.8191495055, -37.7819779443))
            Line((-64.8191495055, -37.7819779443), (-63.7662851797, -39.4824122158))
        make_face()
        with BuildLine():
            ThreePointArc((-58.978385981, 11.024971069), (-58.7864166416, 12.0065489812), (-58.5781120687, 12.9847905821))
            Line((-58.5781120687, 12.9847905821), (-73.3554834407, 15.7471600356))
            Line((-73.3554834407, 15.7471600356), (-73.7229824763, 13.7812138362))
            Line((-73.7229824763, 13.7812138362), (-58.978385981, 11.024971069))
        make_face()
        with BuildLine():
            Line((-73.7229824763, -13.7812138362), (-58.978385981, -11.024971069))
            ThreePointArc((-58.978385981, -11.024971069), (-59.1539667436, -10.0403296009), (-59.31311014, -9.0528981834))
            Line((-59.31311014, -9.0528981834), (-74.0904815119, -11.8152676369))
            Line((-74.0904815119, -11.8152676369), (-73.7229824763, -13.7812138362))
        make_face()
    extrude(amount=F9_DEPTH)

    # F11 (on offset) → F12 (join, through all)
    with BuildSketch(Plane.XZ.offset(-98.5)):
        Circle(F11_R)
    extrude(amount=F12_DEPTH)


with BuildPart() as f1_2:
    add(f1_1.part)

    add(f9.part)  # F14 merges F9
    # F13 (on face) → F14 (join)
    with BuildSketch(Plane(origin=(0, 85.5, 0), x_dir=(-1, 0, 0), z_dir=(0, 1, 0))):
        Circle(F13_R)
        Circle(F13_R_2, mode=Mode.SUBTRACT)
    extrude(amount=F14_DEPTH)

    # F15 (size 5 in the source; OpenCascade refuses exactly that, so slightly less here)
    f15_edges = [f1_2.edges().sort_by_distance(p)[0] for p in [
        (91.018463, 93.5, 0),
        (-35, 98.5, 0),
    ]]
    chamfer(f15_edges, length=F15_SIZE)

    # F16: fillet of radius 10 on 1 edges, made by hand

    # F16_s1 → F16_t2 (revolve, cut)
    with BuildSketch(Plane.XY):
        with BuildLine():
            ThreePointArc((70, 6), (73.6879258149, 1.6333997347), (79.1651513899, 0))
            Line((79.1651513899, 0), (70, 0))
            Line((70, 0), (70, 6))
        make_face()
    revolve(axis=Axis((0, 0, 0), (0, -1, 0)), mode=Mode.SUBTRACT)


with BuildPart() as f17:
    # F13 (on face) → F17 (new body)
    with BuildSketch(Plane(origin=(0, 85.5, 0), x_dir=(-1, 0, 0), z_dir=(0, 1, 0))):
        Circle(F13_R)
        Circle(F13_R_3, mode=Mode.SUBTRACT)
        Circle(F13_R_3)
        Circle(F13_R_2, mode=Mode.SUBTRACT)
    extrude(amount=F17_DEPTH)


solid = f1_2.part
